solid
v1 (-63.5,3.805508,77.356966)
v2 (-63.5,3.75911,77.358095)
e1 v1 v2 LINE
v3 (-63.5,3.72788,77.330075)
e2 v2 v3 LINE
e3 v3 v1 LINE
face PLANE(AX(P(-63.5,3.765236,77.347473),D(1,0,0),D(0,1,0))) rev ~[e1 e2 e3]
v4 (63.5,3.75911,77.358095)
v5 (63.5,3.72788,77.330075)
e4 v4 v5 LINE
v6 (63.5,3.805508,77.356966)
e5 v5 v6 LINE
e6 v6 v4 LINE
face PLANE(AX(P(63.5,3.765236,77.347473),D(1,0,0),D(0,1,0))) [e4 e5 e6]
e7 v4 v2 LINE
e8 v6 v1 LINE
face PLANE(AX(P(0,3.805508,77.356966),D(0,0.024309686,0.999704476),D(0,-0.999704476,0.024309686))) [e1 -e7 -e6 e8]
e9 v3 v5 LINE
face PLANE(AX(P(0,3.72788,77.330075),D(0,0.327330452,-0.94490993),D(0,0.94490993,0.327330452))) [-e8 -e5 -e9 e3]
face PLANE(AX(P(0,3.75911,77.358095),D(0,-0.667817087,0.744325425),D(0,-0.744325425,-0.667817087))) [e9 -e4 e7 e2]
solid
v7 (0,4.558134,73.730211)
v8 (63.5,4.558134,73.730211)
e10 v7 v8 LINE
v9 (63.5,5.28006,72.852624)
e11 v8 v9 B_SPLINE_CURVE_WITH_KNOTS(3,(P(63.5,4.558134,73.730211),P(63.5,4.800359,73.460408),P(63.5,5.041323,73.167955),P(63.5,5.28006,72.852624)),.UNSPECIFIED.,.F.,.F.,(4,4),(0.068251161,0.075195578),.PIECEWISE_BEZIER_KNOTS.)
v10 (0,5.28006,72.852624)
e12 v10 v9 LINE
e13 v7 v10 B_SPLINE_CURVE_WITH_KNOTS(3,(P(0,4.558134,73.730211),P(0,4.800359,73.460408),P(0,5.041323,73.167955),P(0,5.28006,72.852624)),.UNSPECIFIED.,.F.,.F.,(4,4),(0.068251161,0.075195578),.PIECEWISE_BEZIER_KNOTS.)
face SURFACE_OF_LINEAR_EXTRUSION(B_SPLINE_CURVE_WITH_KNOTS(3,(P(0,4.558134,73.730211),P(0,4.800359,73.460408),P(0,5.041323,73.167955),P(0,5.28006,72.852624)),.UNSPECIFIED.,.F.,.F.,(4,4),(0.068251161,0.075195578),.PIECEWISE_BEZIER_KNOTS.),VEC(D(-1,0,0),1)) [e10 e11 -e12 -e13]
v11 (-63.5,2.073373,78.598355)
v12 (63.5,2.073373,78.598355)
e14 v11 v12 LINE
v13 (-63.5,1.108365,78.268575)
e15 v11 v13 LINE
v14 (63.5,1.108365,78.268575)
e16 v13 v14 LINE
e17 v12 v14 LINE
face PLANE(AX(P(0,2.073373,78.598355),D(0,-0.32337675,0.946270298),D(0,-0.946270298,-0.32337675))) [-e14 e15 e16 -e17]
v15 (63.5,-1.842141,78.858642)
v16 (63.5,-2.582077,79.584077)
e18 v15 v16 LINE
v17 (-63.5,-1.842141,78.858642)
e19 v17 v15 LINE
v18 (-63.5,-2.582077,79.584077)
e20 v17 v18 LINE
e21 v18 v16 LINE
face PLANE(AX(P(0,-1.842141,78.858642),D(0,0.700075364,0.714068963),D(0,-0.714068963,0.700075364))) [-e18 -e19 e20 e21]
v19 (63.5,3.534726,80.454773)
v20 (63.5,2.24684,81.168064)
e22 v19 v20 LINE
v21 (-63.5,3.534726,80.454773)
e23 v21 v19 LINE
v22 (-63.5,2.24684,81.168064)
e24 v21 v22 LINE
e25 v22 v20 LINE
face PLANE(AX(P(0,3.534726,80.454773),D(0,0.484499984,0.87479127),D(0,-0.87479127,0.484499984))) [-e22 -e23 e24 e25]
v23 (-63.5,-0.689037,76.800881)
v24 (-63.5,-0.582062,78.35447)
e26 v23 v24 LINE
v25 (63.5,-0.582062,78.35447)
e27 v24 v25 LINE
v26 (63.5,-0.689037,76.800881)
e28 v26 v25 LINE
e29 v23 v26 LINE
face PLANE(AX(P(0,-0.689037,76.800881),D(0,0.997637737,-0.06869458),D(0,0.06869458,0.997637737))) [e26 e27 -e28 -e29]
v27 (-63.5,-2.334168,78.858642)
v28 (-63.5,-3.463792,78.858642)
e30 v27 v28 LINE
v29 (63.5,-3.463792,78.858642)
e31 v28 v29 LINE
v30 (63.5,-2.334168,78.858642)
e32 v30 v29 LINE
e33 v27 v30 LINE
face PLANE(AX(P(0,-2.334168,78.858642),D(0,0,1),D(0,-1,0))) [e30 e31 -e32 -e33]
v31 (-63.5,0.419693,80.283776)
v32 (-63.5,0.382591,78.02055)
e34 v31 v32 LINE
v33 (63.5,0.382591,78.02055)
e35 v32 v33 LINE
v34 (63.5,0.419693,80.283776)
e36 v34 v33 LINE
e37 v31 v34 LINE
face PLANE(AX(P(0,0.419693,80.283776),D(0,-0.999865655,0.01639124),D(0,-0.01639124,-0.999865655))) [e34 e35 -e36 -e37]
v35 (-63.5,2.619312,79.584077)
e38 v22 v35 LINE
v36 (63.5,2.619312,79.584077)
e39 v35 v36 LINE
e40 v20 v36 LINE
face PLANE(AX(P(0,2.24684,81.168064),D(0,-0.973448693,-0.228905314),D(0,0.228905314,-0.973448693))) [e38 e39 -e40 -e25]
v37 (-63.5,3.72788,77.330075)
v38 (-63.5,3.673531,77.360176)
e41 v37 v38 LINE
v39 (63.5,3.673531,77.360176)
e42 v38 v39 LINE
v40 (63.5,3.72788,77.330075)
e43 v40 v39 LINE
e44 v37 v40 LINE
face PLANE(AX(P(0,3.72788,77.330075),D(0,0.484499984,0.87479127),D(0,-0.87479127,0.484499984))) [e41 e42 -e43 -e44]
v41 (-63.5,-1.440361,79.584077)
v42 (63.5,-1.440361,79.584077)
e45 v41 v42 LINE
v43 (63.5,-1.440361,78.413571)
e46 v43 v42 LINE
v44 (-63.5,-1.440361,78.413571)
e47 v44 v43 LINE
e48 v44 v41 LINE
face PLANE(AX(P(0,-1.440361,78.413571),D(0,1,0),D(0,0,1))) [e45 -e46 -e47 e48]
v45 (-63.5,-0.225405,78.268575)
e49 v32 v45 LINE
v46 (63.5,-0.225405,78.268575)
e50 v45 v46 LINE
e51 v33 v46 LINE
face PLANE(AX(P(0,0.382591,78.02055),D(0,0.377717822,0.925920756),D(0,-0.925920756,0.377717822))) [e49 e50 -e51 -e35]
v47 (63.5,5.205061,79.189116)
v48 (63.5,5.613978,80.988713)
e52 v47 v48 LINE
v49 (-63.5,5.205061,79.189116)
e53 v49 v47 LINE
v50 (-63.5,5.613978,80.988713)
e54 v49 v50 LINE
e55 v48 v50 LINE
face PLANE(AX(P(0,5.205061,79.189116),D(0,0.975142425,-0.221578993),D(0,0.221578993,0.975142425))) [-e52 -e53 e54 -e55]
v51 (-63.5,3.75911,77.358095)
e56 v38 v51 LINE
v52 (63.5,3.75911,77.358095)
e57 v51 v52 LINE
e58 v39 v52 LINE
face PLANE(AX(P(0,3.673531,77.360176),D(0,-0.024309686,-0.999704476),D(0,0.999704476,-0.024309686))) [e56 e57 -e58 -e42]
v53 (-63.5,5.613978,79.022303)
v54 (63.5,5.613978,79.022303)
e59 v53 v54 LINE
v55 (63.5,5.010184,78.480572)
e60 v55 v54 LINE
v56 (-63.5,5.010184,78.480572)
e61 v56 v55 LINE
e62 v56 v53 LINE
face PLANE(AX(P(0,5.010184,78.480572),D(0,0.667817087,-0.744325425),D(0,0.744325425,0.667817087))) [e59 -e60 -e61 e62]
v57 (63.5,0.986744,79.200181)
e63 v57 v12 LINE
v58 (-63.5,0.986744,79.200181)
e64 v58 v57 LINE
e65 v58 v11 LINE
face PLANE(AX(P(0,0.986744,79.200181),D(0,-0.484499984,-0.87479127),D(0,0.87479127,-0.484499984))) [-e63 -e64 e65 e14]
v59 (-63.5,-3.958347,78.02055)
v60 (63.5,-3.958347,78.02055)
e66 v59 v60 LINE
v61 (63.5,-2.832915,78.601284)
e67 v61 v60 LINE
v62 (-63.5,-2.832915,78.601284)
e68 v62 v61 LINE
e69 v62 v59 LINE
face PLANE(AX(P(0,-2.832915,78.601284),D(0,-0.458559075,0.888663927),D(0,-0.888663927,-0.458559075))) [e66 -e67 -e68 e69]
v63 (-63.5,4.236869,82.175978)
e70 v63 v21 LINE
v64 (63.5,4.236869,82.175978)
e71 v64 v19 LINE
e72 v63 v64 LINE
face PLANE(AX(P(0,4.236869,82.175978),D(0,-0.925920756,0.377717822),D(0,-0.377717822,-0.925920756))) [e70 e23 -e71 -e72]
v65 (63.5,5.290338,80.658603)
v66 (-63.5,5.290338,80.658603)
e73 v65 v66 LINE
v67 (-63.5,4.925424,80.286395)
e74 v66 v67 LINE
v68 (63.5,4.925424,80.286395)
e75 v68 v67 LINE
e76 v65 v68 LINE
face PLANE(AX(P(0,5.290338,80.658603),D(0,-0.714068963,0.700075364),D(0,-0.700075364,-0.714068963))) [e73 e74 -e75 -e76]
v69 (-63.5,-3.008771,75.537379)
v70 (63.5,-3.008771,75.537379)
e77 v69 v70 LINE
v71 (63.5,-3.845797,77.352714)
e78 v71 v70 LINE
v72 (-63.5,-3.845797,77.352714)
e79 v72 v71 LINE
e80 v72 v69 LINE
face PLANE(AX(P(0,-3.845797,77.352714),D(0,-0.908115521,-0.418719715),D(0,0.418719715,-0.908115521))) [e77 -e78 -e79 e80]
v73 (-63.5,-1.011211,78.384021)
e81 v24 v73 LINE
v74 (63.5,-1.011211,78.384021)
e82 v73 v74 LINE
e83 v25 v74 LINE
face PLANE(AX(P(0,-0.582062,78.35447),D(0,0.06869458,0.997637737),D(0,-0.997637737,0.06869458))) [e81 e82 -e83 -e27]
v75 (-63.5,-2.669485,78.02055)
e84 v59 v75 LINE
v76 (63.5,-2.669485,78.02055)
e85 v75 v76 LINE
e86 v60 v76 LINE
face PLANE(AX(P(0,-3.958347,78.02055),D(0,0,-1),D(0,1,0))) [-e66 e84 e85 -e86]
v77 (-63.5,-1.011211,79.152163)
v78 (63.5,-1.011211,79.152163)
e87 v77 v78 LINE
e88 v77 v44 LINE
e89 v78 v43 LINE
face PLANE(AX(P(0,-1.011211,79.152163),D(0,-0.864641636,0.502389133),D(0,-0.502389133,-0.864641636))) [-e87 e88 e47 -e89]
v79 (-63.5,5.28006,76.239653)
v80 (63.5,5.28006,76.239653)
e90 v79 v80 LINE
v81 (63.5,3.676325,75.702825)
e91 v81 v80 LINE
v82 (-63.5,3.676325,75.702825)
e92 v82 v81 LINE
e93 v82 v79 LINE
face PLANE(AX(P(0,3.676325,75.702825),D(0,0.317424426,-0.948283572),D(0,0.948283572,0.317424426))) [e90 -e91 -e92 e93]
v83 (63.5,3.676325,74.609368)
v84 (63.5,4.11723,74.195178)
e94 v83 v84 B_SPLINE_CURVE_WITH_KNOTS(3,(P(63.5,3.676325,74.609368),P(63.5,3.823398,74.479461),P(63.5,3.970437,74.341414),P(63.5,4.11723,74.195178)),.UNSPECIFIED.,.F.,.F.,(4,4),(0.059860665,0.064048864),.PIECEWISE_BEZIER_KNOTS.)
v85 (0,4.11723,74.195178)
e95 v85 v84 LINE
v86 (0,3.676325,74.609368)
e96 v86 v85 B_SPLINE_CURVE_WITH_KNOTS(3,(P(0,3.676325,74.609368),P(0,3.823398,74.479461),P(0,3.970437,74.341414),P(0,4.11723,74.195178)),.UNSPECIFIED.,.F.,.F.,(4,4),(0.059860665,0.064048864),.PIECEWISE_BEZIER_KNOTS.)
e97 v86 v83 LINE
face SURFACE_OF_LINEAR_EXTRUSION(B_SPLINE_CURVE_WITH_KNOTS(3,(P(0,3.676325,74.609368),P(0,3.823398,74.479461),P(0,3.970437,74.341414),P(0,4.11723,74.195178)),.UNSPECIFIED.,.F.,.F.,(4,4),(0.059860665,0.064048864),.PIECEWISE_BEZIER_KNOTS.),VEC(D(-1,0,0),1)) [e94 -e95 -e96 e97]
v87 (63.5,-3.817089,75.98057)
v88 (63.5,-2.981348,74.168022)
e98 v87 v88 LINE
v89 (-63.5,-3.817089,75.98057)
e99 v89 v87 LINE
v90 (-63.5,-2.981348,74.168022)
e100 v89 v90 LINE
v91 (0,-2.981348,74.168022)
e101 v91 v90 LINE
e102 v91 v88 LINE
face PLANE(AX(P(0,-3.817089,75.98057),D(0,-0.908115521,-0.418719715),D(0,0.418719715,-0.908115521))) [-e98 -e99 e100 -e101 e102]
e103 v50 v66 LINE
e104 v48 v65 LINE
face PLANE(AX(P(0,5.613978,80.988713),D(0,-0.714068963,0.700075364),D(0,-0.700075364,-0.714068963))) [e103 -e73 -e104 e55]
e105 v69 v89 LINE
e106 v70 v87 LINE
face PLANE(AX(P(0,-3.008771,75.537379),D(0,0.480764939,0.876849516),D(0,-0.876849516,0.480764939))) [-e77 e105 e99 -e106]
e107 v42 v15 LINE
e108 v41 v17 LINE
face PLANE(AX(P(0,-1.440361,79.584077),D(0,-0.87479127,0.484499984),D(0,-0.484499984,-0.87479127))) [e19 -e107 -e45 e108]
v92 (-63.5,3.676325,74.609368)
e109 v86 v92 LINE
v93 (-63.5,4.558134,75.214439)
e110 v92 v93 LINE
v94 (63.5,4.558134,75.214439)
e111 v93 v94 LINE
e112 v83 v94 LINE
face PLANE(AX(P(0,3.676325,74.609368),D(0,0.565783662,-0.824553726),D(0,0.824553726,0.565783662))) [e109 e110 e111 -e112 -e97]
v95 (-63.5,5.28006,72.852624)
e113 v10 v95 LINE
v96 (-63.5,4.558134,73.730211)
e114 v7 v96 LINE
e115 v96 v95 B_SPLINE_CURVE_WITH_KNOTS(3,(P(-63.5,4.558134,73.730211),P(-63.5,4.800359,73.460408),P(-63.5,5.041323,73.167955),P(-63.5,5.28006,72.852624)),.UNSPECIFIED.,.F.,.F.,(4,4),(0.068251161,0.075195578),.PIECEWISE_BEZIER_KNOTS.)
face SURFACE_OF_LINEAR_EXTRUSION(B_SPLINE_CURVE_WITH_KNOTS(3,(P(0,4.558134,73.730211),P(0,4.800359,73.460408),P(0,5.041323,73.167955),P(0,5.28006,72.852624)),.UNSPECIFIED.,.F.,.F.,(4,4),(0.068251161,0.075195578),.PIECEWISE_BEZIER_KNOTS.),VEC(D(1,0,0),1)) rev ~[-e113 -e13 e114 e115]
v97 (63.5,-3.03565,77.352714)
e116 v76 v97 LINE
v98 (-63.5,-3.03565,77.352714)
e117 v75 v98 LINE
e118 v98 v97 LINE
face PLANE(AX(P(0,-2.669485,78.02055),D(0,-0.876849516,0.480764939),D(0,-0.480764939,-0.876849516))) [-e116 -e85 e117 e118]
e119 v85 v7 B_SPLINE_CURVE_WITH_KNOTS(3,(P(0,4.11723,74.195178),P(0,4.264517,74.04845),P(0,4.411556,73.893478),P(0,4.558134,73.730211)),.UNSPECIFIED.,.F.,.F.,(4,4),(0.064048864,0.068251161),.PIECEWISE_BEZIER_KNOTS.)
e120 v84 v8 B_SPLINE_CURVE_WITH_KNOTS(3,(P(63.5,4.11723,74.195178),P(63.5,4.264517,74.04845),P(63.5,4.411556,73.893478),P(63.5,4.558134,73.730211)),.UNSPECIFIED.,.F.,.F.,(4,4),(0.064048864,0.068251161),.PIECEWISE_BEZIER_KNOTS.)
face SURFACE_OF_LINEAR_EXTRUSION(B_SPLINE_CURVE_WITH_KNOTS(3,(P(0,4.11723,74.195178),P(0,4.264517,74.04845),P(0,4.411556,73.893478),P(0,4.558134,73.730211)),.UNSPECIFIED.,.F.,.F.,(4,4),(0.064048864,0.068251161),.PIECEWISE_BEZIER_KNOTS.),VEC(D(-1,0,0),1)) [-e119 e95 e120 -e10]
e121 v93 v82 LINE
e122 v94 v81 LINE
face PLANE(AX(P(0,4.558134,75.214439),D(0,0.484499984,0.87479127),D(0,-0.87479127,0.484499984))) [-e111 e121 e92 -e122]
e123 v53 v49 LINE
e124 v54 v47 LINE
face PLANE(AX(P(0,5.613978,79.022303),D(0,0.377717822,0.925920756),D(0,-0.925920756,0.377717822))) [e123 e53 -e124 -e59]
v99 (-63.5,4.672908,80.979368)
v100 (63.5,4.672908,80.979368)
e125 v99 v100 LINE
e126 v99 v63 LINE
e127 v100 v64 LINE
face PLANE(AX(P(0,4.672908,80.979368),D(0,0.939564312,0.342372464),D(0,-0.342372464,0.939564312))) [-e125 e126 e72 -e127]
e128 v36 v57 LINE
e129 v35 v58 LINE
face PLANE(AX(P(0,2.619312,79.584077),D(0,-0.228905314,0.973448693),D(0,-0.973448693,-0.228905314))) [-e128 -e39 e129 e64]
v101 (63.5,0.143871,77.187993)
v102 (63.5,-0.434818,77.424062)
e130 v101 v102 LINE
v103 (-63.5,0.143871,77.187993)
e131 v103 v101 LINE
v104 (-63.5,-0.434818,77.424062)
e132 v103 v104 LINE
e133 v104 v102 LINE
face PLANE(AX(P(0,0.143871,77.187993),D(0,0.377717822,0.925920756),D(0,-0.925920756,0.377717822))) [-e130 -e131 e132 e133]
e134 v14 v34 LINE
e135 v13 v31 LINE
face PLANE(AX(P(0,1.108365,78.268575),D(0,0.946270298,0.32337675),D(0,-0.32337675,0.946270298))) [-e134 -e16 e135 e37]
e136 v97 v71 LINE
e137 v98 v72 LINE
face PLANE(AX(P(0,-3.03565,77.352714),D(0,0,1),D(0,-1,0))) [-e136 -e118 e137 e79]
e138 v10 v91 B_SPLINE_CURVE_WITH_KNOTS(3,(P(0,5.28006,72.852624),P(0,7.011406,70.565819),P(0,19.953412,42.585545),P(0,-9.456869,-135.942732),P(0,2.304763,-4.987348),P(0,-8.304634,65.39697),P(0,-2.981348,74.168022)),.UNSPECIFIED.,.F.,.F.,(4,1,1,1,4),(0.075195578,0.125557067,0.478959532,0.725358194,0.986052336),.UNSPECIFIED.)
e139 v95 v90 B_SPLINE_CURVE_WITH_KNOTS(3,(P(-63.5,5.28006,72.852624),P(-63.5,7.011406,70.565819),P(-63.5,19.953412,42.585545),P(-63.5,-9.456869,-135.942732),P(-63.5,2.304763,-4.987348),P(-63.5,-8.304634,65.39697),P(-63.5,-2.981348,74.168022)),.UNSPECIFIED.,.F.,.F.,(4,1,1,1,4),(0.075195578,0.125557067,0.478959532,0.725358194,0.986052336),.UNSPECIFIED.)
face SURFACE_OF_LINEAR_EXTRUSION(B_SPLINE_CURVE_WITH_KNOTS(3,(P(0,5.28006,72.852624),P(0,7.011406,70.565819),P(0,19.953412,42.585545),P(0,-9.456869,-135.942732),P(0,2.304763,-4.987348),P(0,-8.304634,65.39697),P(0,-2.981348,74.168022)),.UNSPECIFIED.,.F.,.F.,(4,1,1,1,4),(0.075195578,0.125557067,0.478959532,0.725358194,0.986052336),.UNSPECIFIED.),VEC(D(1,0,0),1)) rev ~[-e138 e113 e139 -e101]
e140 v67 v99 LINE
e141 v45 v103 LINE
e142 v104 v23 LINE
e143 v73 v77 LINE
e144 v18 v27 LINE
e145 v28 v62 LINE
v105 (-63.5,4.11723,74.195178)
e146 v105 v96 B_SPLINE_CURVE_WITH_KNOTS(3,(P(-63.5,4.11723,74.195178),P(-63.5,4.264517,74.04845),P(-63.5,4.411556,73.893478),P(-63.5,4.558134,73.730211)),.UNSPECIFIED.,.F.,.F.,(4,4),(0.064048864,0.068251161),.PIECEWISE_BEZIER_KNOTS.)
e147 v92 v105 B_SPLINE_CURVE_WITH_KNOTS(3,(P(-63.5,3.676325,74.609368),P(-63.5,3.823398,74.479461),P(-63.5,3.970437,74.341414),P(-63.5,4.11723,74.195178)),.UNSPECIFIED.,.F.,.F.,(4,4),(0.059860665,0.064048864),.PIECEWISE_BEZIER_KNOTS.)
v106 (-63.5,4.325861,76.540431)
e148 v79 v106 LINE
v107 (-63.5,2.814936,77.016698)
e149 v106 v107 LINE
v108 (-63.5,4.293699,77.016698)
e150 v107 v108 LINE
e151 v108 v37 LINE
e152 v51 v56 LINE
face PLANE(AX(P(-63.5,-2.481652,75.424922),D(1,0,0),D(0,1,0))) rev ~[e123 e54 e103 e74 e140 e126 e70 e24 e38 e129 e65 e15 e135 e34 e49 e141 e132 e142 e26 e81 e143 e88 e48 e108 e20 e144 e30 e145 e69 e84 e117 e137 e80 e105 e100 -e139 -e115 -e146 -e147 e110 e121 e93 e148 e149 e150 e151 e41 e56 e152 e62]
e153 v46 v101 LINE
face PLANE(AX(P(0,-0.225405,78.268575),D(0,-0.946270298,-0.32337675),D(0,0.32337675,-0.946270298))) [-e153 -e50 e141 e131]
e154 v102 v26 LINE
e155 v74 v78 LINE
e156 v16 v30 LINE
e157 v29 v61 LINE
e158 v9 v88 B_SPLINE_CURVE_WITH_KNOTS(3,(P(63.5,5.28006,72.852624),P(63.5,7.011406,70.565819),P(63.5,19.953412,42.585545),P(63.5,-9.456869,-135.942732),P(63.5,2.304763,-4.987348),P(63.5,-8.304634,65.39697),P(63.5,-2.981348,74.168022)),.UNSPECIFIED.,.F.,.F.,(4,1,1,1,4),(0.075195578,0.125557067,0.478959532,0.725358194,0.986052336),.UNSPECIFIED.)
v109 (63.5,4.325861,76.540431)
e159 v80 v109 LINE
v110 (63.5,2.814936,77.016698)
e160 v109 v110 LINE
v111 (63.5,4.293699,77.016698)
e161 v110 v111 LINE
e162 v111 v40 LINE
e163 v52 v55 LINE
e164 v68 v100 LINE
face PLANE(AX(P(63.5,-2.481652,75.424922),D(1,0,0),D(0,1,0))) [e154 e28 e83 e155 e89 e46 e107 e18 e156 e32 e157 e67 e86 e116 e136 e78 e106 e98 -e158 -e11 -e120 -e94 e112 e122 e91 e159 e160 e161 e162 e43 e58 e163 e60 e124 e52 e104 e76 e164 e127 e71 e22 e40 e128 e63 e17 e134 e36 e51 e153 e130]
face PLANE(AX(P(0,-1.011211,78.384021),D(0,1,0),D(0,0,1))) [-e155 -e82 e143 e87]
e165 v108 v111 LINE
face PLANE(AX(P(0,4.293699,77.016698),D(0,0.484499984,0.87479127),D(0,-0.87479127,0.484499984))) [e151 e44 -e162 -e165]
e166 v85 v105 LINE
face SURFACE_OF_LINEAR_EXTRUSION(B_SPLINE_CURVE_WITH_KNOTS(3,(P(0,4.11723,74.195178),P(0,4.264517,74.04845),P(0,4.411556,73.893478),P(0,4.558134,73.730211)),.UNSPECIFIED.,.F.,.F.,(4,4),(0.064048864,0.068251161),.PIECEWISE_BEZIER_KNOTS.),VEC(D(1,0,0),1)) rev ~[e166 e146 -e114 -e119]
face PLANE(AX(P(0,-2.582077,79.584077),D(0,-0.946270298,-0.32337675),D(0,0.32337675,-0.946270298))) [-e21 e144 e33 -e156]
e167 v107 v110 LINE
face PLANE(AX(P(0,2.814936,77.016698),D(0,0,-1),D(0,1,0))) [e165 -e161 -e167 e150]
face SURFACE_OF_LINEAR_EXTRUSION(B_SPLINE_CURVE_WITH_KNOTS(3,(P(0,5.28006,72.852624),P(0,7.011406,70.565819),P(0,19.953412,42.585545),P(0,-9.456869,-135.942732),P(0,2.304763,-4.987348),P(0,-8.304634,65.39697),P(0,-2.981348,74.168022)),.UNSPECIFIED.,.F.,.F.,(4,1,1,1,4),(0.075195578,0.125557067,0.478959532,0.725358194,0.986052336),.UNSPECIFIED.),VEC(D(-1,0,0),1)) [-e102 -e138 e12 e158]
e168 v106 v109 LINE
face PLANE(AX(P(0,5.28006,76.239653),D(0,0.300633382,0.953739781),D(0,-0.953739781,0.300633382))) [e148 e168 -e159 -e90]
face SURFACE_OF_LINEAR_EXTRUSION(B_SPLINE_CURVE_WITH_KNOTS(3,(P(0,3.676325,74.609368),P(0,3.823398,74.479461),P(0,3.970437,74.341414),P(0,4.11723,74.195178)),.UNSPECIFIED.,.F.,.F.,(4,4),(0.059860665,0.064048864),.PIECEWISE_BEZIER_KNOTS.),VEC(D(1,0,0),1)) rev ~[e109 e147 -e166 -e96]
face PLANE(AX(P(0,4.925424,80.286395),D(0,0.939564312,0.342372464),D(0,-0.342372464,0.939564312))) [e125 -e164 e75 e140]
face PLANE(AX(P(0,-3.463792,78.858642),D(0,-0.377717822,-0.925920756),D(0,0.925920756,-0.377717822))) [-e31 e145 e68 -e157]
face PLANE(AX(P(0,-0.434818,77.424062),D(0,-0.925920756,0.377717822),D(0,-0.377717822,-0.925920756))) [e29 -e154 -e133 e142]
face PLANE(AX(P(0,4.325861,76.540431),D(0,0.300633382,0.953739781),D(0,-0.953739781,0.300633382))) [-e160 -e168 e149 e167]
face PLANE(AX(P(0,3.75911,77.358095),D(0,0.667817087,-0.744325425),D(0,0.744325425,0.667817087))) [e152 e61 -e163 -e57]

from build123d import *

# Parameters (mm, degrees)
F1_DEPTH = 63.5


with BuildPart() as f1:
    # F0 (on Right) → F1 (new body, symmetric)
    with BuildSketch(Plane.YZ):
        with BuildLine():
            add(Edge.make_bspline(
                [(-2.5031952433, 74.8461923193), (-2.3533415993, 75.0276387666), (-2.1963644561, 75.1912104401), (-2.0320170307, 75.336497153)],
                knots=[0.9934294222, 0.9934294222, 0.9934294222, 0.9934294222, 1, 1, 1, 1], degree=3))
            add(Edge.make_bspline(
                [(-2.0320170307, 75.336497153), (-1.8891955809, 75.4627544334), (-1.7408081058, 75.5752029408), (-1.5873915563, 75.6737167739)],
                knots=[0, 0, 0, 0, 0.0057099735, 0.0057099735, 0.0057099735, 0.0057099735], degree=3))
            Line((-1.5873915563, 75.6737167739), (-2.3197238782, 75.9019267209))
            Line((-2.3197238782, 75.9019267209), (-3.0087709391, 75.537379435))
            Line((-3.0087709391, 75.537379435), (-3.3884674872, 75.336497153))
            Line((-3.3884674872, 75.336497153), (-2.5031952433, 74.8461923193))
        make_face()
        with BuildLine():
            add(Edge.make_bspline(
                [(-2.0320170307, 75.336497153), (-1.8891955809, 75.4627544334), (-1.7408081058, 75.5752029408), (-1.5873915563, 75.6737167739)],
                knots=[0, 0, 0, 0, 0.0057099735, 0.0057099735, 0.0057099735, 0.0057099735], degree=3))
            add(Edge.make_bspline(
                [(-2.5031952433, 74.8461923193), (-2.3533415993, 75.0276387666), (-2.1963644561, 75.1912104401), (-2.0320170307, 75.336497153)],
                knots=[0.9934294222, 0.9934294222, 0.9934294222, 0.9934294222, 1, 1, 1, 1], degree=3))
            Line((-2.5031952433, 74.8461923193), (-2.981348253, 74.1680218189))
            add(Edge.make_bspline(
                [(5.280060228, 72.8526241439), (7.0114055785, 70.5658194338), (19.9534117553, 42.5855454276), (-9.4568688164, -135.9427321675), (2.3047634441, -4.9873481871), (-8.3046344498, 65.3969700213), (-2.981348253, 74.1680218189)],
                knots=[0.0751955785, 0.0751955785, 0.0751955785, 0.0751955785, 0.1255570674, 0.4789595318, 0.7253581944, 0.9860523361, 0.9860523361, 0.9860523361, 0.9860523361], degree=3))
            add(Edge.make_bspline(
                [(4.558134096, 73.7302112384), (4.8003585227, 73.4604084562), (5.0413225391, 73.1679549189), (5.280060228, 72.8526241439)],
                knots=[0.0682511607, 0.0682511607, 0.0682511607, 0.0682511607, 0.0751955785, 0.0751955785, 0.0751955785, 0.0751955785], degree=3))
            add(Edge.make_bspline(
                [(4.1172295334, 74.1951779468), (4.264516573, 74.048449974), (4.4115561068, 73.8934778), (4.558134096, 73.7302112384)],
                knots=[0.0640488644, 0.0640488644, 0.0640488644, 0.0640488644, 0.0682511607, 0.0682511607, 0.0682511607, 0.0682511607], degree=3))
            add(Edge.make_bspline(
                [(3.6763249708, 74.609368014), (3.8233977451, 74.4794605202), (3.9704365633, 74.3414137255), (4.1172295334, 74.1951779468)],
                knots=[0.0598606647, 0.0598606647, 0.0598606647, 0.0598606647, 0.0640488644, 0.0640488644, 0.0640488644, 0.0640488644], degree=3))
            add(Edge.make_bspline(
                [(2.0872520516, 75.7028253852), (2.6106797609, 75.4435060137), (3.1437250175, 75.0798067166), (3.6763249708, 74.609368014)],
                knots=[0.0446937854, 0.0446937854, 0.0446937854, 0.0446937854, 0.0598606647, 0.0598606647, 0.0598606647, 0.0598606647], degree=3))
            Line((2.0872520516, 75.7028253852), (0.9867487565, 76.098998544))
            add(Edge.make_bspline(
                [(-0.3830142642, 76.1440130478), (0.0531822749, 76.2183929611), (0.5125534467, 76.2040407853), (0.9867487565, 76.098998544)],
                knots=[0.0196351754, 0.0196351754, 0.0196351754, 0.0196351754, 0.0338877489, 0.0338877489, 0.0338877489, 0.0338877489], degree=3))
            Line((-0.3830142642, 76.1440130478), (-1.5873915563, 75.6737167739))
        make_face()
        with BuildLine():
            Line((-2.2569033628, 77.1257479092), (-1.5873915563, 75.6737167739))
            add(Edge.make_bspline(
                [(-1.5873915563, 75.6737167739), (-1.2132468387, 75.9139674535), (-0.8091916762, 76.0713415886), (-0.3830142642, 76.1440130478)],
                knots=[0.0057099735, 0.0057099735, 0.0057099735, 0.0057099735, 0.0196351754, 0.0196351754, 0.0196351754, 0.0196351754], degree=3))
            Line((-0.3830142642, 76.1440130478), (-0.6890374261, 76.8008807945))
            Line((-0.6890374261, 76.8008807945), (-1.4403613131, 78.4135705847))
            Line((-1.4403613131, 78.4135705847), (-1.6477123366, 78.8586421238))
            Line((-1.6477123366, 78.8586421238), (-2.2407262096, 78.5852114929))
            Line((-2.2407262096, 78.5852114929), (-2.1511793417, 78.3231779933))
            Line((-2.1511793417, 78.3231779933), (-2.5002173073, 78.4655636773))
            Line((-2.5002173073, 78.4655636773), (-2.8090220876, 78.3231779933))
            Line((-2.8090220876, 78.3231779933), (-2.6694845793, 78.0205503106))
            Line((-2.6694845793, 78.0205503106), (-2.2899973688, 77.1975218893))
            Line((-2.2899973688, 77.1975218893), (-2.1982068219, 77.239845262))
            Line((-2.1982068219, 77.239845262), (-2.2569033628, 77.1257479092))
        make_face()
        Polygon((-2.3197238782, 75.9019267209), (-1.5873915563, 75.6737167739), (-2.2569033628, 77.1257479092), (-2.8081836648, 76.0541409256), align=None)
        with BuildLine():
            add(Edge.make_bspline(
                [(-1.5873915563, 75.6737167739), (-1.2132468387, 75.9139674535), (-0.8091916762, 76.0713415886), (-0.3830142642, 76.1440130478)],
                knots=[0.0057099735, 0.0057099735, 0.0057099735, 0.0057099735, 0.0196351754, 0.0196351754, 0.0196351754, 0.0196351754], degree=3))
            Line((-1.5873915563, 75.6737167739), (-0.3830142642, 76.1440130478))
        make_face()
        with BuildLine():
            Line((-2.981348253, 74.1680218189), (-2.5031952433, 74.8461923193))
            add(Edge.make_bspline(
                [(-2.981348253, 74.1680218189), (-2.8307106495, 74.416223808), (-2.6714427358, 74.6424741518), (-2.5031952433, 74.8461923193)],
                knots=[0.9860523361, 0.9860523361, 0.9860523361, 0.9860523361, 0.9934294222, 0.9934294222, 0.9934294222, 0.9934294222], degree=3))
        make_face()
        with BuildLine():
            add(Edge.make_bspline(
                [(-2.981348253, 74.1680218189), (-2.8307106495, 74.416223808), (-2.6714427358, 74.6424741518), (-2.5031952433, 74.8461923193)],
                knots=[0.9860523361, 0.9860523361, 0.9860523361, 0.9860523361, 0.9934294222, 0.9934294222, 0.9934294222, 0.9934294222], degree=3))
            Line((-2.5031952433, 74.8461923193), (-3.3884674872, 75.336497153))
            Line((-3.3884674872, 75.336497153), (-3.0087709391, 75.537379435))
            Line((-3.0087709391, 75.537379435), (-3.817089441, 75.9805697295))
            Line((-3.817089441, 75.9805697295), (-2.981348253, 74.1680218189))
        make_face()
        with BuildLine():
            Line((-0.6890374261, 76.8008807945), (-0.3830142642, 76.1440130478))
            add(Edge.make_bspline(
                [(-0.3830142642, 76.1440130478), (0.0531822749, 76.2183929611), (0.5125534467, 76.2040407853), (0.9867487565, 76.098998544)],
                knots=[0.0196351754, 0.0196351754, 0.0196351754, 0.0196351754, 0.0338877489, 0.0338877489, 0.0338877489, 0.0338877489], degree=3))
            Line((0.9867487565, 76.098998544), (0.7385915378, 76.1883333325))
            Line((0.7385915378, 76.1883333325), (2.0733734483, 78.5983552125))
            Line((2.0733734483, 78.5983552125), (1.1083647041, 78.2685748189))
            Line((1.1083647041, 78.2685748189), (0.3825913591, 78.0205503106))
            Line((0.3825913591, 78.0205503106), (-0.2254049465, 78.2685748189))
            Line((-0.2254049465, 78.2685748189), (0.1438712369, 77.187992853))
            Line((0.1438712369, 77.187992853), (-0.4348183983, 77.4240620708))
            Line((-0.4348183983, 77.4240620708), (-0.6890374261, 76.8008807945))
        make_face()
        Polygon((-2.8081836648, 76.0541409256), (-2.2569033628, 77.1257479092), (-2.2899973688, 77.1975218893), (-3.4018163569, 76.6848772764), (-3.0356504681, 77.3527137935), (-3.8457969204, 77.3527137935), (-3.0087709391, 75.537379435), (-2.3197238782, 75.9019267209), align=None)
        Polygon((-2.2899973688, 77.1975218893), (-2.2569033628, 77.1257479092), (-2.1982068219, 77.239845262), align=None)
        with BuildLine():
            Line((0.7385915378, 76.1883333325), (0.9867487565, 76.098998544))
            add(Edge.make_bspline(
                [(0.9867487565, 76.098998544), (1.3462748329, 76.0193574676), (1.7143224031, 75.8875841978), (2.0872520516, 75.7028253852)],
                knots=[0.0338877489, 0.0338877489, 0.0338877489, 0.0338877489, 0.0446937854, 0.0446937854, 0.0446937854, 0.0446937854], degree=3))
            Line((2.0872520516, 75.7028253852), (2.8149356255, 77.0166979519))
            Line((2.8149356255, 77.0166979519), (3.1620607729, 77.6434514267))
            Line((3.1620607729, 77.6434514267), (4.059301739, 79.2634691559))
            Line((4.059301739, 79.2634691559), (4.2368694943, 79.5840774682))
            Line((4.2368694943, 79.5840774682), (2.9990179464, 80.2696570754))
            Line((2.9990179464, 80.2696570754), (2.619312158, 79.5840774682))
            Line((2.619312158, 79.5840774682), (2.0733734483, 78.5983552125))
            Line((2.0733734483, 78.5983552125), (0.7385915378, 76.1883333325))
        make_face()
        with BuildLine():
            add(Edge.make_bspline(
                [(0.9867487565, 76.098998544), (1.3462748329, 76.0193574676), (1.7143224031, 75.8875841978), (2.0872520516, 75.7028253852)],
                knots=[0.0338877489, 0.0338877489, 0.0338877489, 0.0338877489, 0.0446937854, 0.0446937854, 0.0446937854, 0.0446937854], degree=3))
            Line((0.9867487565, 76.098998544), (2.0872520516, 75.7028253852))
        make_face()
        Polygon((-1.4403613131, 78.4135705847), (-0.6890374261, 76.8008807945), (-0.5820615334, 78.3544704318), (-1.0112114232, 78.3840205083), align=None)
        Polygon((-3.4018163569, 76.6848772764), (-2.2899973688, 77.1975218893), (-2.6694845793, 78.0205503106), (-3.0356504681, 77.3527137935), align=None)
        with BuildLine():
            Line((3.6763249708, 76.1440130478), (2.0872520516, 75.7028253852))
            add(Edge.make_bspline(
                [(2.0872520516, 75.7028253852), (2.6106797609, 75.4435060137), (3.1437250175, 75.0798067166), (3.6763249708, 74.609368014)],
                knots=[0.0446937854, 0.0446937854, 0.0446937854, 0.0446937854, 0.0598606647, 0.0598606647, 0.0598606647, 0.0598606647], degree=3))
            Line((3.6763249708, 74.609368014), (3.6763249708, 75.7028253852))
            Line((3.6763249708, 75.7028253852), (3.6763249708, 76.1440130478))
        make_face()
        Polygon((2.8149356255, 77.0166979519), (2.0872520516, 75.7028253852), (3.6763249708, 76.1440130478), (3.6763249708, 75.7028253852), (5.280060228, 76.2396529317), (4.3258606793, 76.5404312399), align=None)
        Polygon((-1.0112114232, 79.1521631181), (-1.4403613131, 78.4135705847), (-1.0112114232, 78.3840205083), align=None)
        Polygon((-1.6477123366, 78.8586421238), (-1.4403613131, 78.4135705847), (-1.4403613131, 79.5840774682), (-1.8421410574, 78.8586421238), (-2.5820769138, 79.5840774682), (-2.3341679132, 78.8586421238), (-2.2407262096, 78.5852114929), align=None)
        Polygon((-3.9583467878, 78.0205503106), (-2.6694845793, 78.0205503106), (-2.8090220876, 78.3231779933), (-2.5002173073, 78.4655636773), (-2.832915338, 78.6012836886), align=None)
        Polygon((3.6763249708, 75.7028253852), (3.6763249708, 74.609368014), (4.558134096, 75.2144385873), align=None)
        Polygon((3.1620607729, 77.6434514267), (2.8149356255, 77.0166979519), (4.2936985152, 77.0166979519), (3.7278796441, 77.3300746893), (3.6735305559, 77.3601757354), align=None)
        Polygon((0.9867440243, 79.2001809928), (2.0733734483, 78.5983552125), (2.619312158, 79.5840774682), align=None)
        Polygon((4.059301739, 79.2634691559), (3.1620607729, 77.6434514267), (3.6735305559, 77.3601757354), (3.7591097802, 77.3580947163), (5.0101839906, 78.4805724743), align=None)
        Polygon((2.2468396386, 81.1680637901), (2.619312158, 79.5840774682), (2.9990179464, 80.2696570754), (4.2368694943, 79.5840774682), (4.9254237576, 80.2863950385), (4.6729080744, 80.9793676024), (4.2368694943, 82.1759775281), (3.534725517, 80.4547728496), align=None)
        Polygon((0.3825913591, 78.0205503106), (1.1083647041, 78.2685748189), (0.4196934169, 80.2837759256), align=None)
        Polygon((-2.1511793417, 78.3231779933), (-2.2407262096, 78.5852114929), (-2.5002173073, 78.4655636773), align=None)
        Polygon((-2.5002173073, 78.4655636773), (-2.2407262096, 78.5852114929), (-2.3341679132, 78.8586421238), (-2.832915338, 78.6012836886), align=None)
        Polygon((-3.4637924188, 78.8586421238), (-2.832915338, 78.6012836886), (-2.3341679132, 78.8586421238), align=None)
        Polygon((4.2368694943, 79.5840774682), (4.059301739, 79.2634691559), (5.0101839906, 78.4805724743), (5.6139780208, 79.0223032236), (5.2050605226, 79.1891160159), align=None)
        Polygon((4.9254237576, 80.2863950385), (4.2368694943, 79.5840774682), (5.2050605226, 79.1891160159), (5.6139780208, 80.9887126088), (5.2903378525, 80.6586032931), align=None)
    extrude(amount=F1_DEPTH, both=True)


with BuildPart() as f1b:
    # F0 (on Right) → F1, piece 2 (new body, symmetric)
    with BuildSketch(Plane.YZ):
        Polygon((3.7591097802, 77.3580947163), (3.7278796441, 77.3300746893), (3.8055084945, 77.3569664447), align=None)
    extrude(amount=F1_DEPTH, both=True)


solid = Compound([f1.part, f1b.part])
